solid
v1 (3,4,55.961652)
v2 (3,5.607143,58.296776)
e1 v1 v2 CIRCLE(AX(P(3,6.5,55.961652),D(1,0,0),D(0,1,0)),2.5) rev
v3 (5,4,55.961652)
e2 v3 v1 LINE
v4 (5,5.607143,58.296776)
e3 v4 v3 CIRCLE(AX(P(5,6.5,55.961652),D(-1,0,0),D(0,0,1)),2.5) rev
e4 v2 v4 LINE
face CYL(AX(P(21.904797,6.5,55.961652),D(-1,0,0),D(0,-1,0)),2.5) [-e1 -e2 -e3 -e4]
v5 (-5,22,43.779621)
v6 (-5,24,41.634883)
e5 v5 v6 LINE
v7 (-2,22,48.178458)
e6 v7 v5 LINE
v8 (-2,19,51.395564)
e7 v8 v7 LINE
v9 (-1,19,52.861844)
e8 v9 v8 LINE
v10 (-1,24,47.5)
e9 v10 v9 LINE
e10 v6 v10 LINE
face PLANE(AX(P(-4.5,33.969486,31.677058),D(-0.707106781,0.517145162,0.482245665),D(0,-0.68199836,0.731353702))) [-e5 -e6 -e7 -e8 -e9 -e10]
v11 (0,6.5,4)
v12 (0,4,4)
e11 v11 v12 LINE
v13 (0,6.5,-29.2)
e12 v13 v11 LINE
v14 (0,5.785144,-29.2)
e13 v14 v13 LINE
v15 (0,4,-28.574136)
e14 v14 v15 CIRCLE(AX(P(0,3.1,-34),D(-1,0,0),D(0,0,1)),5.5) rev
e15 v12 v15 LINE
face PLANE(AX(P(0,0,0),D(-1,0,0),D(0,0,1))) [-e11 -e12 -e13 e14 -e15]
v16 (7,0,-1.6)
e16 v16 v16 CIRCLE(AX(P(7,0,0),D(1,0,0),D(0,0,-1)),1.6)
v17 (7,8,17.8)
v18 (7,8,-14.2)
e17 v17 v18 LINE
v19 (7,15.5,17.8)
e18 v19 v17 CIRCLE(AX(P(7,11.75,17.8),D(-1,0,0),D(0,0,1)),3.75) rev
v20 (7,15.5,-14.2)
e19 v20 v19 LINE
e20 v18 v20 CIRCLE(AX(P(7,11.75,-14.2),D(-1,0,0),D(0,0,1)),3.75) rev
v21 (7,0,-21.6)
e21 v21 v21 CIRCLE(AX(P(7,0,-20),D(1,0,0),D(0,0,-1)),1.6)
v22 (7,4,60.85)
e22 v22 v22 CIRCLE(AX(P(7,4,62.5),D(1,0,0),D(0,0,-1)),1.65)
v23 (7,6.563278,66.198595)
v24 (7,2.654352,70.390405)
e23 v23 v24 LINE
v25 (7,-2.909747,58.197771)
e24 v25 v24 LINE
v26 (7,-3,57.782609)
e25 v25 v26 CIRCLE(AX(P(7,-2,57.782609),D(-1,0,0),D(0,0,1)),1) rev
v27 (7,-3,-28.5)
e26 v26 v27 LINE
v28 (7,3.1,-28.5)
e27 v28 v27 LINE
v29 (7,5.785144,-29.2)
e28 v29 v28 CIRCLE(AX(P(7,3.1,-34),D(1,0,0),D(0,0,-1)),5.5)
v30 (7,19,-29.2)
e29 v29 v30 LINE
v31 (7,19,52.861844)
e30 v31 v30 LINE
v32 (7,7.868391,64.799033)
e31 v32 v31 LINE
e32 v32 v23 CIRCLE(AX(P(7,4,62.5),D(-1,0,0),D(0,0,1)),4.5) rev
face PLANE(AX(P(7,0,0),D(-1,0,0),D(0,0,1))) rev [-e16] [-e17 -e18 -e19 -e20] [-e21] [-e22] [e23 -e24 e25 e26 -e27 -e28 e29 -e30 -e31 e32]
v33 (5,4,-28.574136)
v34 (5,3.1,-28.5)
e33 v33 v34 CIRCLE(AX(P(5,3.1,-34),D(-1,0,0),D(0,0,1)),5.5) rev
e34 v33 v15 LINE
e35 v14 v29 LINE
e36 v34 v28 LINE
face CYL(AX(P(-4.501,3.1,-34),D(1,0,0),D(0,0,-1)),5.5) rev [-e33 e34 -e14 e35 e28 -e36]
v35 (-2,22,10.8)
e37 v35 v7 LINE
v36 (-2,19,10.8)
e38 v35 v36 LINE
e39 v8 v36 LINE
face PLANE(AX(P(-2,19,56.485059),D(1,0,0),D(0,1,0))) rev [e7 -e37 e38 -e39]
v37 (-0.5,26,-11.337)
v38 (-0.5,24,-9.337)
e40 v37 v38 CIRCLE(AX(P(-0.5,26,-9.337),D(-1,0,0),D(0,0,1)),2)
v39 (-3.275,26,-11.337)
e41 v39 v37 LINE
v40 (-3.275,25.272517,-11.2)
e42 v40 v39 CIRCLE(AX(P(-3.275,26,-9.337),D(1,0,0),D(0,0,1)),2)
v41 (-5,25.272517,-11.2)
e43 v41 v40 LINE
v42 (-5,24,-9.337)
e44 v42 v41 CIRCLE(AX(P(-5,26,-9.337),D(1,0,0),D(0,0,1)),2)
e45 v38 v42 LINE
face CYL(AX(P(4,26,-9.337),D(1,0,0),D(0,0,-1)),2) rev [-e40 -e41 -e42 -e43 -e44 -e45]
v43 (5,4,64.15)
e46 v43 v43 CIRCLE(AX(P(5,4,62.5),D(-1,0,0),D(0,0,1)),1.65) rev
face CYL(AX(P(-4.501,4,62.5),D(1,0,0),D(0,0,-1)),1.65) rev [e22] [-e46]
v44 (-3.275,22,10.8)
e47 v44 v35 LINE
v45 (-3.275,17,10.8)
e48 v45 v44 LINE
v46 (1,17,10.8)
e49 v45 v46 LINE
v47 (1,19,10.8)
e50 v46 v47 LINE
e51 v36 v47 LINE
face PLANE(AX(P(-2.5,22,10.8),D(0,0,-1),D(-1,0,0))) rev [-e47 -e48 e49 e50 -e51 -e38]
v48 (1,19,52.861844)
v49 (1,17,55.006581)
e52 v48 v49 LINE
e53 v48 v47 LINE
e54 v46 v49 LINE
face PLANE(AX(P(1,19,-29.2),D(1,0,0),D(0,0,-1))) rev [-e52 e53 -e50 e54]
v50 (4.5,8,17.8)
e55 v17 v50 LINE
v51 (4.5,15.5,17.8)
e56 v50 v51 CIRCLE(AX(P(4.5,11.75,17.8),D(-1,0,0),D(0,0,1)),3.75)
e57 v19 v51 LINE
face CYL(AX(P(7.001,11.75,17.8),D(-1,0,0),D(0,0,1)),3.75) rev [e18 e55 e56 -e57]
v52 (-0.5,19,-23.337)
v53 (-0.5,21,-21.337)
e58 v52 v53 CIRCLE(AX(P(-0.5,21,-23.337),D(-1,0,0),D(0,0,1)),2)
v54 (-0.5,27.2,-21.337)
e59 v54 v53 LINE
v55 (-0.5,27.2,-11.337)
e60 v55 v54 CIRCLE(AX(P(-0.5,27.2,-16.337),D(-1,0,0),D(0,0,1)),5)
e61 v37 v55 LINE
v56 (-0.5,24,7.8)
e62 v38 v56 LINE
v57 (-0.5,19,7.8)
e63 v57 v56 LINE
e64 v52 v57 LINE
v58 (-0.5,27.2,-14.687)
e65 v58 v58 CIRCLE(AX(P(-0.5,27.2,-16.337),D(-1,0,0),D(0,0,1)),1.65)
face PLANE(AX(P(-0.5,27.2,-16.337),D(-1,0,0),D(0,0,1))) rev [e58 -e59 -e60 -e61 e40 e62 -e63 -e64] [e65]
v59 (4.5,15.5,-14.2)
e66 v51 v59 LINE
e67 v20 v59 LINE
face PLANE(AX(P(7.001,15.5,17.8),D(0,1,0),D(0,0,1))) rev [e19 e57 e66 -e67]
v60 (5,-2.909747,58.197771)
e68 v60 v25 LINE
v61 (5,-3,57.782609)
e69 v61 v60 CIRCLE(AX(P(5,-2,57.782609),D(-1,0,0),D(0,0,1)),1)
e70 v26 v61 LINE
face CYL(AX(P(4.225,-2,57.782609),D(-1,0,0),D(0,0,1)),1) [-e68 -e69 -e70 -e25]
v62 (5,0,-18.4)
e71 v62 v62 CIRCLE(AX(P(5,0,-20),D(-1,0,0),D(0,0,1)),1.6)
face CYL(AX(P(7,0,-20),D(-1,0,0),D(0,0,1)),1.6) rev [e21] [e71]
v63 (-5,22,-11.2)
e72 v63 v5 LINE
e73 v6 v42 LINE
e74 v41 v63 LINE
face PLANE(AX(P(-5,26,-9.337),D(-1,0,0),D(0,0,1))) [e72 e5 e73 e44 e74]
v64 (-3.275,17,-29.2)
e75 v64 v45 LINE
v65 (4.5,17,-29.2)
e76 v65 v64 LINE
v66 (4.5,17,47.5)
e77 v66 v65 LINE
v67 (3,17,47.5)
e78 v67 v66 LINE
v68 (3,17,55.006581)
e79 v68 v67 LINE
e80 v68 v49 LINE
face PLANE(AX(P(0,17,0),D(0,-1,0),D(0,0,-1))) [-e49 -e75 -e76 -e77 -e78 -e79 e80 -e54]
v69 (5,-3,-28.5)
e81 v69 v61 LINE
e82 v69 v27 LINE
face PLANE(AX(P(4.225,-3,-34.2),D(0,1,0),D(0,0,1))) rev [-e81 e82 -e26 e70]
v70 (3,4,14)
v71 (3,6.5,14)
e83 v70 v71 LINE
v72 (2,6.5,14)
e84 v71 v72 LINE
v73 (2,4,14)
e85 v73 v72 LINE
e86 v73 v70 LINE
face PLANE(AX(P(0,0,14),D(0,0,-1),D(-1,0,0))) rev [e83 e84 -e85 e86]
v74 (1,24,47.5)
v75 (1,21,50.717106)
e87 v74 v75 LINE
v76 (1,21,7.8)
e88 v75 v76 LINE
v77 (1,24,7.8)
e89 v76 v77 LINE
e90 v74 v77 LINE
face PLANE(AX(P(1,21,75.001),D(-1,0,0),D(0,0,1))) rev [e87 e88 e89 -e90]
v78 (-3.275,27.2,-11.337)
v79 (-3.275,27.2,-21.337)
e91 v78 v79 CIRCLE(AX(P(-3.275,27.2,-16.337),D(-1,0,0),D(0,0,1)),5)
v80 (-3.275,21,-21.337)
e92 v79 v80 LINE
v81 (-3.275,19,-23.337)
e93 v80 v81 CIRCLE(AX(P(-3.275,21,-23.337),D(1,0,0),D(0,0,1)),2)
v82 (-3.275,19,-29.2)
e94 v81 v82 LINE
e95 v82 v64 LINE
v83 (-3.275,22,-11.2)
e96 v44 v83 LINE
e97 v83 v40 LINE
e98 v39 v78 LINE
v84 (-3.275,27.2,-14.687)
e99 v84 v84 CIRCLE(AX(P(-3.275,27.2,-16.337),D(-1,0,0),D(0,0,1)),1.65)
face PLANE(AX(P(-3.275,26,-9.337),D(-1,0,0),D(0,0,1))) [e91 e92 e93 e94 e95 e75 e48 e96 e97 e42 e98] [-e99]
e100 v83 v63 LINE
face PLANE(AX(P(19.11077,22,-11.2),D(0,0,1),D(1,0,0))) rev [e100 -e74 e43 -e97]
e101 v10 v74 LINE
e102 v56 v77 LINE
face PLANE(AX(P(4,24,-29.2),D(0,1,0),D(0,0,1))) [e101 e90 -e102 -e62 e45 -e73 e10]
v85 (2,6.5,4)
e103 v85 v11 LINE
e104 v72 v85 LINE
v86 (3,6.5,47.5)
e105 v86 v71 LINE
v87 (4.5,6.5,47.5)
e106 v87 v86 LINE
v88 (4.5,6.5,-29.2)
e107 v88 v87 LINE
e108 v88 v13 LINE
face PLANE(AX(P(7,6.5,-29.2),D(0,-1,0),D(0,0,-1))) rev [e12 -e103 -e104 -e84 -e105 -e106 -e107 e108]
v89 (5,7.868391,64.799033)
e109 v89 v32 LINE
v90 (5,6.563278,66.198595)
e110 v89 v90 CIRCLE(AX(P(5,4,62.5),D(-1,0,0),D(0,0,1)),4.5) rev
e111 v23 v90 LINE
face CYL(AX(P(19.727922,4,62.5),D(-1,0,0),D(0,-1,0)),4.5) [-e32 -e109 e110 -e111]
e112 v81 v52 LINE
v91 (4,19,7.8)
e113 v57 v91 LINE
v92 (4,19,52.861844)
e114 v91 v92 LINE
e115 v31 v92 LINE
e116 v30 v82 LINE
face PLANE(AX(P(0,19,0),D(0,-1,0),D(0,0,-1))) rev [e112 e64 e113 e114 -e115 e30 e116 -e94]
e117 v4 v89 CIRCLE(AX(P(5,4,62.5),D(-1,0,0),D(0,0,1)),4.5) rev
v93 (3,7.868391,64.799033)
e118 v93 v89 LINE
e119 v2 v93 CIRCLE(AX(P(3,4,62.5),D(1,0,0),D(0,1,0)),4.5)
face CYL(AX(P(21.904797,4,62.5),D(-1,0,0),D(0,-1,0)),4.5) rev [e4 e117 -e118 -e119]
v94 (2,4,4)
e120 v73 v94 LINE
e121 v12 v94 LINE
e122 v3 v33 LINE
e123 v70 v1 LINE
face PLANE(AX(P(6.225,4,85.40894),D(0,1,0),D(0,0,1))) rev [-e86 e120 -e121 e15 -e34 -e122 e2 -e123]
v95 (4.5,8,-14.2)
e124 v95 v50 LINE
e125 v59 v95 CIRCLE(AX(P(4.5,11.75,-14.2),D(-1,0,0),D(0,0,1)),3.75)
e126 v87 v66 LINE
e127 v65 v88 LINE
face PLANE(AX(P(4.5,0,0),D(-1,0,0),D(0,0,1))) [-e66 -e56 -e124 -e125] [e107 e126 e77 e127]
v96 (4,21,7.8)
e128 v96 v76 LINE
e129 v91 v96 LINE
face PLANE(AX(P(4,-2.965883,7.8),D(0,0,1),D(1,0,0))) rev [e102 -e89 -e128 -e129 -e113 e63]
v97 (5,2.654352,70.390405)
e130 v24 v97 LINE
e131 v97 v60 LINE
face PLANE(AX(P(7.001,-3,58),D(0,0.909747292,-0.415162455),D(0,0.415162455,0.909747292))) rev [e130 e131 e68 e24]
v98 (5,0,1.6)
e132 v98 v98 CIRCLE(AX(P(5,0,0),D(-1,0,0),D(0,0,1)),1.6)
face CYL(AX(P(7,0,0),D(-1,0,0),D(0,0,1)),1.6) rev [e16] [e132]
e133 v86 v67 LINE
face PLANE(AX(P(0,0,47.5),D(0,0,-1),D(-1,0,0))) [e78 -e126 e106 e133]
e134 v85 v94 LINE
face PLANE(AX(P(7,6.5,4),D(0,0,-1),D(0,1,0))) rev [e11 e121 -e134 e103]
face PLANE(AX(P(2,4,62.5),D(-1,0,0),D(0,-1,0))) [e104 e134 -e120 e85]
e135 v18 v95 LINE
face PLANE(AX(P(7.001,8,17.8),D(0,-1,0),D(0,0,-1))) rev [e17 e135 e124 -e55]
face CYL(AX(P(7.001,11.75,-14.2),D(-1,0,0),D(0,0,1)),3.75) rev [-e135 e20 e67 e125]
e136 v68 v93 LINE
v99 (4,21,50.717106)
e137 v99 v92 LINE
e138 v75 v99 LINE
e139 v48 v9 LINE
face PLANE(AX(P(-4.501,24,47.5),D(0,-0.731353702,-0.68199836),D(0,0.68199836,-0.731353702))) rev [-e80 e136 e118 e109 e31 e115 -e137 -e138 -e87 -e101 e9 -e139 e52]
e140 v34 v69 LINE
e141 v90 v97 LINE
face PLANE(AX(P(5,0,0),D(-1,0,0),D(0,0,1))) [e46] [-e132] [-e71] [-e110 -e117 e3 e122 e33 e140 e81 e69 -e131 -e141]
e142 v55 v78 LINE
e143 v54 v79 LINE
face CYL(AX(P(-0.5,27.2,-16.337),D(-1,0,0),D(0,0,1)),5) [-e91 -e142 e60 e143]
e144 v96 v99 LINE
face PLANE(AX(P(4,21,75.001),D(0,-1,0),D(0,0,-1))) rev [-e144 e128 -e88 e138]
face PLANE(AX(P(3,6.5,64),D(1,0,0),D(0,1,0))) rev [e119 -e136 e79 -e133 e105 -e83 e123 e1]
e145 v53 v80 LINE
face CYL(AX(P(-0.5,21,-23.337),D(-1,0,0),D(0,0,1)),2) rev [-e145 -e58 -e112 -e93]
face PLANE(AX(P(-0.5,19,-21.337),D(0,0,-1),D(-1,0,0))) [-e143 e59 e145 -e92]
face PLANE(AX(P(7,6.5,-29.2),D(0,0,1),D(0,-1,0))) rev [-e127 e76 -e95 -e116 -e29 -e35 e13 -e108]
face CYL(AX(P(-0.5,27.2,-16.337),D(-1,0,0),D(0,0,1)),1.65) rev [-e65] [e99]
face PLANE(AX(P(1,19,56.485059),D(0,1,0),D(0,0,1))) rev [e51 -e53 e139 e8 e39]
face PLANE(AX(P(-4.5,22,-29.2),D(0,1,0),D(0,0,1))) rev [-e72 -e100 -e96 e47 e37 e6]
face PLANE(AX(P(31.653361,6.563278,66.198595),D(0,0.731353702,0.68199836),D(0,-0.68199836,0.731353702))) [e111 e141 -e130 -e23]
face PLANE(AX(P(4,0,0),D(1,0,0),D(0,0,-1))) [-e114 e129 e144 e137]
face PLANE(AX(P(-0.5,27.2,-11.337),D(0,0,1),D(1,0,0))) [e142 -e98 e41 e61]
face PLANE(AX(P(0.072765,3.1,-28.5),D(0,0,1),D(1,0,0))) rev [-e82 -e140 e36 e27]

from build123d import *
from build123d.topology import SkipClean

# Parameters (mm, degrees)
SKETCH_1_W                       = 33.2
SKETCH_1_H                       = 22
SKETCH_1_R                       = 1.6
EXTRUDE_1_DEPTH                  = 7
SKETCH_2_W                       = 33.2
SKETCH_2_H                       = 10.5
EXTRUDE_2_DEPTH                  = 2
EXTRUDE_3_DEPTH                  = 60
SKETCH_4_W                       = 2
SKETCH_4_H                       = 10.5
EXTRUDE_4_DEPTH                  = 38.5
SKETCH_5_W                       = 4
SKETCH_5_H                       = 10.5
EXTRUDE_5_DEPTH                  = 2
SKETCH_6_W                       = 4
SKETCH_6_H                       = 10.5
EXTRUDE_6_DEPTH                  = 19.5
SKETCH_7_W                       = 6
SKETCH_7_H                       = 93.2
EXTRUDE_7_DEPTH                  = 2
SKETCH_8_W                       = 93.2
SKETCH_8_H                       = 5
EXTRUDE_8_DEPTH                  = 3
SKETCH_10_W                      = 93.2
SKETCH_10_H                      = 2
EXTRUDE_9_DEPTH                  = 5.5
SKETCH_12_W                      = 18
SKETCH_12_H                      = 2
CUT_EXTRUDE_1_DEPTH              = 5.5
SKETCH_13_W                      = 40
SKETCH_13_H                      = 5
EXTRUDE_10_DEPTH                 = 3.5
CUT_EXTRUDE_2_REACH              = 70.879
SKETCH_15_W                      = 15.5
SKETCH_15_H                      = 5
SKETCH_16_W                      = 3.5
SKETCH_16_H                      = 2.5
EXTRUDE_12_DEPTH                 = 2
CUT_EXTRUDE_3_REACH              = 71.313
CHAMFER_1_SIZE                   = 3.5
SKETCH_18_R                      = 1.65
EXTRUDE_13_DEPTH                 = 2
FILLET_1_R                       = 2
SKETCH_19_W                      = 4.5
SKETCH_19_H                      = 21.5
CUT_EXTRUDE_4_DEPTH              = 5
CHAMFER_2_SIZE                   = 3
CUT_EXTRUDE_5_REACH              = 74.561
SKETCH_20_R                      = 1.65
EXTRUDE_14_REACH                 = 73.895
SKETCH_21_R                      = 4.5
SKETCH_21_R_2                    = 1.65
EXTRUDE_15_DEPTH                 = 6
EXTRUDE_16_DEPTH                 = 4
CUT_EXTRUDE_6_REACH              = 83.84
SKETCH_24_R                      = 1.65
CUT_EXTRUDE_7_REACH              = 84.171
SKETCH_26_W                      = 2
SKETCH_26_H                      = 10.5
CUT_EXTRUDE_8_DEPTH              = 5
SKETCH_27_W                      = 2
SKETCH_27_H                      = 2
EXTRUDE_17_DEPTH                 = 10
CUT_EXTRUDE_9_DEPTH              = 2
CUT_EXTRUDE_10_REACH             = 84.426
SKETCH_29_R                      = 5.5
SKETCH_30_W                      = 63
SKETCH_30_H                      = 2
EXTRUDE_18_DEPTH                 = 1
SKETCH_32_R                      = 1.65
EXTRUDE_19_DEPTH                 = 0.775
EXTRUDE_20_DEPTH                 = 5.5
SKETCH_35_W                      = 5
SKETCH_35_H                      = 10
CUT_EXTRUDE_12_DEPTH             = 1.225
SKETCH_36_W                      = 4
SKETCH_36_H                      = 10
EXTRUDE_21_DEPTH                 = 5
CUT_EXTRUDE_13_REACH             = 84.197
SKETCH_37_W                      = 4.75
SKETCH_37_H                      = 3
CUT_EXTRUDE_13_DIRECTION_2_REACH = 84.197
CUT_EXTRUDE_14_REACH             = 84.197
SKETCH_38_W                      = 14.6
SKETCH_38_H                      = 11
CUT_EXTRUDE_14_DIRECTION_2_DEPTH = 1
SKETCH_39_W                      = 1.5
SKETCH_39_H                      = 20
EXTRUDE_22_DEPTH                 = 5.8
EXTRUDE_22_DIRECTION_2_REACH     = 116.063
SKETCH_40_W                      = 1.5
SKETCH_40_H                      = 10
EXTRUDE_23_DEPTH                 = 5
CUT_EXTRUDE_15_REACH             = 84.085
SKETCH_41_W                      = 1
SKETCH_41_H                      = 7
CHAMFER_3_SIZE                   = 1
SKETCH_42_W                      = 2.775
SKETCH_42_H                      = 5
EXTRUDE_24_DEPTH                 = 10.8
CUT_EXTRUDE_16_REACH             = 84.085
SKETCH_43_W                      = 0.6
SKETCH_43_H                      = 2
SKETCH_44_W                      = 9.8
SKETCH_44_H                      = 2
EXTRUDE_25_DEPTH                 = 2
SKETCH_45_W                      = 0.8
SKETCH_45_H                      = 6.1
CUT_EXTRUDE_17_DEPTH             = 0.775
CUT_EXTRUDE_18_REACH             = 84.426
SKETCH_46_R                      = 2.05
CUT_EXTRUDE_19_DEPTH             = 1
SKETCH_48_R                      = 2.05
CUT_EXTRUDE_20_DEPTH             = 5
CUT_EXTRUDE_21_REACH             = 113.959
SKETCH_50_W                      = 0.5
SKETCH_50_H                      = 17.5
CUT_EXTRUDE_22_DEPTH             = 3
EXTRUDE_26_DEPTH                 = 14.5
EXTRUDE_27_DEPTH                 = 0.5
SKETCH_54_W                      = 28.68337521
SKETCH_54_H                      = 12.5
SKETCH_54_W_2                    = 11.341687605
CUT_EXTRUDE_23_DEPTH             = 3
EXTRUDE_28_REACH                 = 83.879
FILLET_2_R                       = 0.8
EXTRUDE_START                    = -3.5
SKETCH_56_R                      = 4
SKETCH_56_R_2                    = 2.05
EXTRUDE_29_DEPTH                 = 3.5
FILLET_3_R                       = 0.8
CUT_EXTRUDE_24_REACH             = 83.879
SKETCH_57_R                      = 2.05
SKETCH_58_W                      = 15.2
SKETCH_58_H                      = 8.5
CUT_EXTRUDE_25_DEPTH             = 3.5
FILLET_4_R                       = 0.8
EXTRUDE_START_2                  = 0.5
SKETCH_31_W                      = 76.7
SKETCH_31_H                      = 10.5
EXTRUDE_30_DEPTH                 = 0.5
CUT_EXTRUDE_26_REACH             = 83.939
SKETCH_59_W                      = 2.6
SKETCH_59_H                      = 10
CUT_EXTRUDE_27_REACH             = 83.939
EXTRUDE_31_DEPTH                 = 1.5
SKETCH_62_W                      = 2.775
SKETCH_62_H                      = 2
EXTRUDE_32_DEPTH                 = 1.5
EXTRUDE_33_DEPTH                 = 1.5
SKETCH_64_W                      = 4.275
SKETCH_64_H                      = 5
EXTRUDE_34_DEPTH                 = 5
CHAMFER_4_SIZE                   = 2
EXTRUDE_START_3                  = 1.5
SKETCH_65_R                      = 2.05
EXTRUDE_35_DEPTH                 = 1.5
CUT_EXTRUDE_28_DEPTH             = 1
SKETCH_67_W                      = 1.5
SKETCH_67_H                      = 1.5
EXTRUDE_36_DEPTH                 = 1.5
CUT_EXTRUDE_29_REACH             = 76.844
EXTRUDE_37_REACH                 = 74.163
CUT_EXTRUDE_30_DEPTH             = 10
EXTRUDE_38_DEPTH                 = 0.5
CUT_EXTRUDE_START                = -36.378813151
CUT_EXTRUDE_31_OUTLINE_W         = 3
CUT_EXTRUDE_31_OUTLINE_H         = 6
CUT_EXTRUDE_31_DEPTH             = 0.35355339
FILLET_5_R                       = 1
CUT_EXTRUDE_32_DEPTH             = 101
CUT_EXTRUDE_34_REACH             = 83.84
CUT_EXTRUDE_34_DIRECTION_2_REACH = 83.84
EXTRUDE_START_4                  = 1.225
SKETCH_76_R                      = 1.6
EXTRUDE_40_DEPTH                 = 1.225
CUT_EXTRUDE_35_DEPTH             = 4
CUT_EXTRUDE_36_REACH             = 79.818
FILLET_7_R                       = 1
FILLET_8_R                       = 2.5


# Read off the part's stored shape, not the designer's step: 切除-拉伸31
# Some blends are built 0.0001 mm under size
with BuildPart() as part:
    # 草图1 → 凸台-拉伸1 (new body)
    with BuildSketch(Plane(origin=(0, 0, 0), x_dir=(0, 0, -1), z_dir=(1, 0, 0))):
        with Locations((12.6, -4.5)):
            Rectangle(SKETCH_1_W, SKETCH_1_H)
        Circle(SKETCH_1_R, mode=Mode.SUBTRACT)
        with Locations((20, 0)):
            Circle(SKETCH_1_R, mode=Mode.SUBTRACT)
    extrude(amount=EXTRUDE_1_DEPTH)

    # 草图2 → 凸台-拉伸2 (add)
    with BuildSketch(Plane(origin=(7, 0, 0), x_dir=(0, 0, -1), z_dir=(1, 0, 0))):
        with Locations((12.6, 11.75)):
            Rectangle(SKETCH_2_W, SKETCH_2_H)
    extrude(amount=-EXTRUDE_2_DEPTH)

    # 草图3 → 凸台-拉伸3 (add)
    with BuildSketch(Plane.XY.offset(4)):
        Polygon((7, -15.5), (1, -15.5), (1, 4.5), (3, 4.5), (3, 6.5), (7, 6.5), align=None)
    extrude(amount=EXTRUDE_3_DEPTH)

    # 草图4 → 凸台-拉伸4 (add)
    with BuildSketch(Plane.XY.offset(4)):
        with Locations((6, 11.75)):
            Rectangle(SKETCH_4_W, SKETCH_4_H)
    extrude(amount=EXTRUDE_4_DEPTH)

    # 草图5 → 凸台-拉伸5 (add)
    with BuildSketch(Plane.XY.offset(42.5)):
        with Locations((5, 11.75)):
            Rectangle(SKETCH_5_W, SKETCH_5_H)
    extrude(amount=EXTRUDE_5_DEPTH)

    # 草图6 → 凸台-拉伸6 (add)
    with BuildSketch(Plane.XY.offset(44.5)):
        with Locations((5, 11.75)):
            Rectangle(SKETCH_6_W, SKETCH_6_H)
    extrude(amount=EXTRUDE_6_DEPTH)

    # 草图7 → 凸台-拉伸7 (add)
    with BuildSketch(Plane(origin=(0, 17, 0), x_dir=(1, 0, 0), z_dir=(0, 1, 0))):
        with Locations((4, -17.4)):
            Rectangle(SKETCH_7_W, SKETCH_7_H)
    extrude(amount=EXTRUDE_7_DEPTH)

    # 草图8 → 凸台-拉伸8 (add)
    with BuildSketch(Plane.ZY.offset(-1)):
        with Locations((17.4, 21.5)):
            Rectangle(SKETCH_8_W, SKETCH_8_H)
    extrude(amount=-EXTRUDE_8_DEPTH)

    # 草图10 → 凸台-拉伸9 (add)
    with BuildSketch(Plane.ZY.offset(-1)):
        with Locations((17.4, 23)):
            Rectangle(SKETCH_10_W, SKETCH_10_H)
    extrude(amount=EXTRUDE_9_DEPTH)

    # 草图12 → 切除-拉伸1 (cut)
    with BuildSketch(Plane.ZY.offset(4.5)):
        with Locations((-20.2, 23)):
            Rectangle(SKETCH_12_W, SKETCH_12_H)
    extrude(amount=-CUT_EXTRUDE_1_DEPTH, mode=Mode.SUBTRACT)

    # 草图13 → 凸台-拉伸10 (add)
    with BuildSketch(Plane.ZY.offset(-1)):
        with Locations((-9.2, 19.5)):
            Rectangle(SKETCH_13_W, SKETCH_13_H)
    extrude(amount=EXTRUDE_10_DEPTH)

    # 草图15 → 切除-拉伸2 (cut, up to next)
    with BuildSketch(Plane(origin=(4, 0, 0), x_dir=(0, 0, -1), z_dir=(1, 0, 0)), mode=Mode.PRIVATE) as cut_extrude_2_sk1:
        with Locations((21.45, 21.5)):
            Rectangle(SKETCH_15_W, SKETCH_15_H)
    cut_extrude_2_tool1 = extrude(cut_extrude_2_sk1.sketch, amount=-CUT_EXTRUDE_2_REACH, mode=Mode.PRIVATE) & part.part
    add(cut_extrude_2_tool1.solids().sort_by_distance((4, 21.5, -21.45))[0], mode=Mode.SUBTRACT)

    # 草图16 → 凸台-拉伸12 (add)
    with BuildSketch(Plane(origin=(0, 22, 0), x_dir=(1, 0, 0), z_dir=(0, 1, 0))):
        with Locations((-0.75, 12.45)):
            Rectangle(SKETCH_16_W, SKETCH_16_H)
    extrude(amount=EXTRUDE_12_DEPTH)

    # 草图17 → 切除-拉伸3 (cut, up to next)
    with BuildSketch(Plane(origin=(7, 0, 0), x_dir=(0, 0, -1), z_dir=(1, 0, 0)), mode=Mode.PRIVATE) as cut_extrude_3_sk1:
        Polygon((-47.5, 24), (-64, 8.613501079), (-64, 24), align=None)
    cut_extrude_3_tool1 = extrude(cut_extrude_3_sk1.sketch, amount=-CUT_EXTRUDE_3_REACH, mode=Mode.PRIVATE) & part.part
    add(cut_extrude_3_tool1.solids().sort_by_distance((7, 18.871167, 58.5))[0], mode=Mode.SUBTRACT)

    # 倒角1
    # the kernel refuses this chamfer: 3.5 mm, written as the material it takes off along each edge
    with BuildSketch(Plane(origin=(-4.5, 15.861407469, 56.227571974), x_dir=(0.9996219169112969, 0.020109211138415985, 0.018752142756900524), z_dir=(0, 0.6819983600625026, -0.7313537016191667))) as chamfer_1_piece_1:
        Polygon((CHAMFER_1_SIZE * 0.999621916911, CHAMFER_1_SIZE * 0.0274958766106), (-CHAMFER_1_SIZE * 0.0274958766106, CHAMFER_1_SIZE * 0.999621916911), (0, 0), align=None)
    extrude(amount=20.934339287, mode=Mode.SUBTRACT)

    # 草图18 → 凸台-拉伸13 (add)
    with BuildSketch(Plane.ZY.offset(2.5)):
        with BuildLine():
            Line((-11.337, 27.2), (-11.337, 24))
            Line((-11.337, 24), (-13.7, 24))
            Line((-13.7, 24), (-13.7, 19))
            Line((-13.7, 19), (-21.337, 19))
            Line((-21.337, 19), (-21.337, 27.2))
            ThreePointArc((-21.337, 27.2), (-16.337, 32.2), (-11.337, 27.2))
        make_face()
        with Locations((-16.337, 27.2)):
            Circle(SKETCH_18_R, mode=Mode.SUBTRACT)
    extrude(amount=-EXTRUDE_13_DEPTH)

    # 圆角1
    fillet_1_edges = [part.edges().sort_by_distance(p)[0] for p in [
        (-1.5, 24, -11.337),
        (-1.5, 19, -21.337),
    ]]
    fillet(fillet_1_edges, radius=FILLET_1_R)

    # 草图19 → 切除-拉伸4 (cut)
    with BuildSketch(Plane(origin=(0, 24, 0), x_dir=(1, 0, 0), z_dir=(0, 1, 0))):
        with Locations((1.75, 2.95)):
            Rectangle(SKETCH_19_W, SKETCH_19_H)
    extrude(amount=-CUT_EXTRUDE_4_DEPTH, mode=Mode.SUBTRACT)

    # 倒角2
    chamfer_2_edges = [part.edges().sort_by_distance(p)[0] for p in [
        (4, 24, 27.65),
        (1, 22, 30.22236871),
    ]]
    chamfer(chamfer_2_edges, length=CHAMFER_2_SIZE)

    # 草图20 → 切除-拉伸5 (cut, up to next)
    with BuildSketch(Plane(origin=(7, 0, 0), x_dir=(0, 0, -1), z_dir=(1, 0, 0)), mode=Mode.PRIVATE) as cut_extrude_5_sk1:
        with Locations((-62.5, 4)):
            Circle(SKETCH_20_R)
    cut_extrude_5_tool1 = extrude(cut_extrude_5_sk1.sketch, amount=-CUT_EXTRUDE_5_REACH, mode=Mode.PRIVATE) & part.part
    add(cut_extrude_5_tool1.solids().sort_by_distance((7, 4, 62.5))[0], mode=Mode.SUBTRACT)

    # 凸台-拉伸14: up to this face of the body (flat: up to its plane)
    extrude_14_end = Plane(part.part.faces().sort_by_distance((7, 1.498387626, 16.627822956))[0])
    # 草图21 → 凸台-拉伸14 (add, up to the picked face)
    with BuildSketch(Plane.ZY.offset(-1), mode=Mode.PRIVATE) as extrude_14_sk1:
        with Locations((62.5, 4)):
            Circle(SKETCH_21_R)
        with Locations(Location((62.5, 4, 0), (0, 0, 180))):
            Circle(SKETCH_21_R_2, mode=Mode.SUBTRACT)
    extrude_14_tool1 = split(extrude(extrude_14_sk1.sketch, amount=-EXTRUDE_14_REACH, mode=Mode.PRIVATE), bisect_by=extrude_14_end, keep=Keep.BOTH, mode=Mode.PRIVATE)
    add(extrude_14_tool1.solids().sort_by(Axis((1, 4, 58.127279), (1, 0, 0)))[0])

    # 草图22 → 凸台-拉伸15 (add)
    with BuildSketch(Plane.ZY.offset(-1)):
        with BuildLine():
            Line((66.198595209, 6.563277878), (75, -1.644164869))
            Line((75, -1.644164869), (75, -15.5))
            Line((75, -15.5), (64, -15.5))
            Line((64, -15.5), (64, -0.242640687))
            ThreePointArc((64, -0.242640687), (66.782111619, 2.616699568), (66.198595209, 6.563277878))
        make_face()
    extrude(amount=-EXTRUDE_15_DEPTH)

    # 草图23 → 凸台-拉伸16 (add)
    with BuildSketch(Plane(origin=(7, 0, 0), x_dir=(0, 0, -1), z_dir=(1, 0, 0))):
        Polygon((-64, 8.613501079), (-64.799032902, 7.868390843), (-64, 8.242640687), align=None)
    extrude(amount=-EXTRUDE_16_DEPTH)

    # 草图24 → 切除-拉伸6 (cut, up to next)
    with BuildSketch(Plane.ZY.offset(-1), mode=Mode.PRIVATE) as cut_extrude_6_sk1:
        with Locations(Location((71, -10.5, 0), (0, 0, 270))):
            Circle(SKETCH_24_R)
    cut_extrude_6_tool1 = extrude(cut_extrude_6_sk1.sketch, amount=-CUT_EXTRUDE_6_REACH, mode=Mode.PRIVATE) & part.part
    add(cut_extrude_6_tool1.solids().sort_by_distance((1, -10.5, 71))[0], mode=Mode.SUBTRACT)

    # 草图25 → 切除-拉伸7 (cut, up to next)
    with BuildSketch(Plane.ZY.offset(-5), mode=Mode.PRIVATE) as cut_extrude_7_sk1:
        with BuildLine():
            Line((17.8, 8), (-14.2, 8))
            ThreePointArc((-14.2, 8), (-17.95, 11.75), (-14.2, 15.5))
            Line((-14.2, 15.5), (17.8, 15.5))
            ThreePointArc((17.8, 15.5), (21.55, 11.75), (17.8, 8))
        make_face()
    cut_extrude_7_tool1 = extrude(cut_extrude_7_sk1.sketch, amount=-CUT_EXTRUDE_7_REACH, mode=Mode.PRIVATE) & part.part
    add(cut_extrude_7_tool1.solids().sort_by_distance((5, 11.75, 1.8))[0], mode=Mode.SUBTRACT)

    # 草图26 → 切除-拉伸8 (cut)
    with BuildSketch(Plane(origin=(0, 0, 42.5), x_dir=(-1, 0, 0), z_dir=(0, 0, -1))):
        with Locations((-4, 11.75)):
            Rectangle(SKETCH_26_W, SKETCH_26_H)
    extrude(amount=-CUT_EXTRUDE_8_DEPTH, mode=Mode.SUBTRACT)

    # 草图27 → 凸台-拉伸17 (add)
    with BuildSketch(Plane.XY.offset(4)):
        with Locations((2, 5.5)):
            Rectangle(SKETCH_27_W, SKETCH_27_H)
    extrude(amount=EXTRUDE_17_DEPTH)

    # 草图28 → 切除-拉伸9 (cut)
    with BuildSketch(Plane.ZY.offset(-1)):
        Polygon((67, 1.494263267), (67, -15.5), (75, -15.5), (75, -1.644164869), (69.155582564, 3.80584256), align=None)
    extrude(amount=-CUT_EXTRUDE_9_DEPTH, mode=Mode.SUBTRACT)

    # 草图29 → 切除-拉伸10 (cut, up to next)
    with BuildSketch(Plane(origin=(7, 0, 0), x_dir=(0, 0, -1), z_dir=(1, 0, 0)), mode=Mode.PRIVATE) as cut_extrude_10_sk1:
        with Locations((34, 3.1)):
            Circle(SKETCH_29_R)
    cut_extrude_10_tool1 = extrude(cut_extrude_10_sk1.sketch, amount=-CUT_EXTRUDE_10_REACH, mode=Mode.PRIVATE) & part.part
    add(cut_extrude_10_tool1.solids().sort_by_distance((7, 3.1, -34))[0], mode=Mode.SUBTRACT)

    # 草图30 → 凸台-拉伸18 (add)
    with BuildSketch(Plane.ZY.offset(-1)):
        with Locations((35.5, -5.5)):
            Rectangle(SKETCH_30_W, SKETCH_30_H)
    extrude(amount=EXTRUDE_18_DEPTH)

    # 草图32 → 凸台-拉伸19 (add)
    with BuildSketch(Plane.ZY.offset(2.5)):
        with BuildLine():
            Line((-11.2, 22), (-11.2, 25.272517354))
            ThreePointArc((-11.2, 25.272517354), (-11.302451602, 25.62986489), (-11.337, 26))
            Line((-11.337, 26), (-11.337, 27.2))
            ThreePointArc((-11.337, 27.2), (-16.337, 32.2), (-21.337, 27.2))
            Line((-21.337, 27.2), (-21.337, 21))
            ThreePointArc((-21.337, 21), (-21.922786438, 19.585786438), (-23.337, 19))
            Line((-23.337, 19), (-29.2, 19))
            Line((-29.2, 19), (-29.2, 17))
            Line((-29.2, 17), (10.8, 17))
            Line((10.8, 17), (10.8, 22))
            Line((10.8, 22), (-11.2, 22))
        make_face()
        with Locations((-16.337, 27.2)):
            Circle(SKETCH_32_R, mode=Mode.SUBTRACT)
    extrude(amount=EXTRUDE_19_DEPTH)

    # 草图34 → 凸台-拉伸20 (add)
    with BuildSketch(Plane.XZ.offset(15.5)):
        Polygon((3, 75), (3, 67), (1, 67), (1, 4), (0, 4), (0, -29.2), (7, -29.2), (7, 75), align=None)
    extrude(amount=EXTRUDE_20_DEPTH)

    # 草图35 → 切除-拉伸12 (cut)
    with BuildSketch(Plane.ZY):
        with Locations((-26.7, -16)):
            Rectangle(SKETCH_35_W, SKETCH_35_H)
    extrude(amount=-CUT_EXTRUDE_12_DEPTH, mode=Mode.SUBTRACT)

    # 草图36 → 凸台-拉伸21 (add)
    with BuildSketch(Plane(origin=(0, 0, -29.2), x_dir=(-1, 0, 0), z_dir=(0, 0, -1))):
        with Locations((-3.225, -16)):
            Rectangle(SKETCH_36_W, SKETCH_36_H)
    extrude(amount=EXTRUDE_21_DEPTH)

    # 草图37 → 切除-拉伸13 (cut, up to next)
    with BuildSketch(Plane(origin=(5.225, 0, 0), x_dir=(0, 0, -1), z_dir=(1, 0, 0)), mode=Mode.PRIVATE) as cut_extrude_13_sk1:
        with Locations((31.225, -14.5)):
            Rectangle(SKETCH_37_W, SKETCH_37_H)
    cut_extrude_13_tool1 = extrude(cut_extrude_13_sk1.sketch, amount=-CUT_EXTRUDE_13_REACH, mode=Mode.PRIVATE) & part.part
    add(cut_extrude_13_tool1.solids().sort_by_distance((5.225, -14.5, -31.225))[0], mode=Mode.SUBTRACT)

    # 草图37 → 切除-拉伸13 direction 2 (cut, up to next)
    with BuildSketch(Plane(origin=(5.225, 0, 0), x_dir=(0, 0, -1), z_dir=(1, 0, 0)), mode=Mode.PRIVATE) as cut_extrude_13_direction_2_sk1:
        with Locations((31.225, -14.5)):
            Rectangle(SKETCH_37_W, SKETCH_37_H)
    cut_extrude_13_direction_2_tool1 = extrude(cut_extrude_13_direction_2_sk1.sketch, amount=CUT_EXTRUDE_13_DIRECTION_2_REACH, mode=Mode.PRIVATE) & part.part
    add(cut_extrude_13_direction_2_tool1.solids().sort_by_distance((5.225, -14.5, -31.225))[0], mode=Mode.SUBTRACT)

    # 草图38 → 切除-拉伸14 (cut, up to next)
    with BuildSketch(Plane(origin=(5.225, 0, 0), x_dir=(0, 0, -1), z_dir=(1, 0, 0)), mode=Mode.PRIVATE) as cut_extrude_14_sk1:
        with Locations((26.9, -8.5)):
            Rectangle(SKETCH_38_W, SKETCH_38_H)
    cut_extrude_14_tool1 = extrude(cut_extrude_14_sk1.sketch, amount=CUT_EXTRUDE_14_REACH, mode=Mode.PRIVATE) & part.part
    add(cut_extrude_14_tool1.solids().sort_by_distance((5.225, -8.5, -26.9))[0], mode=Mode.SUBTRACT)

    # 草图38 → 切除-拉伸14 direction 2 (cut)
    with BuildSketch(Plane(origin=(5.225, 0, 0), x_dir=(0, 0, -1), z_dir=(1, 0, 0))):
        with Locations((26.9, -8.5)):
            Rectangle(SKETCH_38_W, SKETCH_38_H)
    extrude(amount=-CUT_EXTRUDE_14_DIRECTION_2_DEPTH, mode=Mode.SUBTRACT)

    # 草图39 → 凸台-拉伸22 (add)
    with BuildSketch(Plane(origin=(0, 0, -34.2), x_dir=(-1, 0, 0), z_dir=(0, 0, -1))):
        with Locations((-3.475, -11)):
            Rectangle(SKETCH_39_W, SKETCH_39_H)
    extrude(amount=EXTRUDE_22_DEPTH)

    # 草图39 → 凸台-拉伸22 direction 2 (add, up to next)
    with BuildSketch(Plane(origin=(0, 0, -34.2), x_dir=(-1, 0, 0), z_dir=(0, 0, -1)), mode=Mode.PRIVATE) as extrude_22_direction_2_sk1:
        with Locations((-3.475, -11)):
            Rectangle(SKETCH_39_W, SKETCH_39_H)
    extrude_22_direction_2_tool1 = extrude(extrude_22_direction_2_sk1.sketch, amount=-EXTRUDE_22_DIRECTION_2_REACH, mode=Mode.PRIVATE) - part.part
    add(extrude_22_direction_2_tool1.solids().sort_by_distance((3.475, -11, -34.2))[0])

    # 草图40 → 凸台-拉伸23 (add)
    with BuildSketch(Plane(origin=(0, 0, -29.2), x_dir=(-1, 0, 0), z_dir=(0, 0, -1))):
        with Locations((-1.975, -6)):
            Rectangle(SKETCH_40_W, SKETCH_40_H)
    extrude(amount=EXTRUDE_23_DEPTH)

    # 草图41 → 切除-拉伸15 (cut, up to next)
    with BuildSketch(Plane(origin=(4.225, 0, 0), x_dir=(0, 0, -1), z_dir=(1, 0, 0)), mode=Mode.PRIVATE) as cut_extrude_15_sk1:
        with Locations((39.5, -4.5)):
            Rectangle(SKETCH_41_W, SKETCH_41_H)
    cut_extrude_15_tool1 = extrude(cut_extrude_15_sk1.sketch, amount=-CUT_EXTRUDE_15_REACH, mode=Mode.PRIVATE) & part.part
    add(cut_extrude_15_tool1.solids().sort_by_distance((4.225, -4.5, -39.5))[0], mode=Mode.SUBTRACT)

    # 倒角3
    chamfer_3_edges = [part.edges().sort_by_distance(p)[0] for p in [
        (3.475, -8, -39),
    ]]
    chamfer(chamfer_3_edges, length=CHAMFER_3_SIZE - 0.0001)  # a hair under: the kernel refuses the full size

    # 草图42 → 凸台-拉伸24 (add)
    with BuildSketch(Plane(origin=(0, 0, -29.2), x_dir=(-1, 0, 0), z_dir=(0, 0, -1))):
        with Locations((-5.6125, -18.5)):
            Rectangle(SKETCH_42_W, SKETCH_42_H)
    extrude(amount=EXTRUDE_24_DEPTH)

    # 草图43 → 切除-拉伸16 (cut, up to next)
    with BuildSketch(Plane(origin=(4.225, 0, 0), x_dir=(0, 0, -1), z_dir=(1, 0, 0)), mode=Mode.PRIVATE) as cut_extrude_16_sk1:
        with Locations((33.9, -15)):
            Rectangle(SKETCH_43_W, SKETCH_43_H)
    cut_extrude_16_tool1 = extrude(cut_extrude_16_sk1.sketch, amount=CUT_EXTRUDE_16_REACH, mode=Mode.PRIVATE) & part.part
    add(cut_extrude_16_tool1.solids().sort_by_distance((4.225, -15, -33.9))[0], mode=Mode.SUBTRACT)

    # 草图44 → 凸台-拉伸25 (add)
    with BuildSketch(Plane(origin=(4.225, 0, 0), x_dir=(0, 0, -1), z_dir=(1, 0, 0))):
        with Locations((34.1, -2)):
            Rectangle(SKETCH_44_W, SKETCH_44_H)
    extrude(amount=EXTRUDE_25_DEPTH)

    # 草图45 → 切除-拉伸17 (cut)
    with BuildSketch(Plane(origin=(7, 0, 0), x_dir=(0, 0, -1), z_dir=(1, 0, 0))):
        with Locations((28.9, 0.05)):
            Rectangle(SKETCH_45_W, SKETCH_45_H)
    extrude(amount=-CUT_EXTRUDE_17_DEPTH, mode=Mode.SUBTRACT)

    # 草图46 → 切除-拉伸18 (cut, up to next)
    with BuildSketch(Plane(origin=(7, 0, 0), x_dir=(0, 0, -1), z_dir=(1, 0, 0)), mode=Mode.PRIVATE) as cut_extrude_18_sk1:
        with Locations((13.25, -17)):
            Circle(SKETCH_46_R)
    cut_extrude_18_tool1 = extrude(cut_extrude_18_sk1.sketch, amount=-CUT_EXTRUDE_18_REACH, mode=Mode.PRIVATE) & part.part
    add(cut_extrude_18_tool1.solids().sort_by_distance((7, -17, -13.25))[0], mode=Mode.SUBTRACT)

    # 草图47 → 切除-拉伸19 (cut)
    with BuildSketch(Plane.ZY.offset(-1)):
        with BuildLine():
            Line((62.5, -0.5), (67, -0.5))
            Line((67, -0.5), (67, -4.5))
            Line((67, -4.5), (4, -4.5))
            Line((4, -4.5), (4, 6.5))
            Line((4, 6.5), (14, 6.5))
            Line((14, 6.5), (14, 4.5))
            Line((14, 4.5), (58.027864045, 4.5))
            ThreePointArc((58.027864045, 4.5), (59.145898034, 1), (62.5, -0.5))
        make_face()
    extrude(amount=-CUT_EXTRUDE_19_DEPTH, mode=Mode.SUBTRACT)

    # 草图48 → 切除-拉伸20 (cut)
    with BuildSketch(Plane.XZ.offset(21)):
        with Locations(Location((3.5, 58, 0), (0, 0, 270))):
            Circle(SKETCH_48_R)
        with Locations(Location((3.5, 20, 0), (0, 0, 270))):
            Circle(SKETCH_48_R)
        with Locations(Location((3.5, -18, 0), (0, 0, 270))):
            Circle(SKETCH_48_R)
    extrude(amount=-CUT_EXTRUDE_20_DEPTH, mode=Mode.SUBTRACT)

    # 草图50 → 切除-拉伸21 (cut, up to next)
    with BuildSketch(Plane.XY.offset(67), mode=Mode.PRIVATE) as cut_extrude_21_sk1:
        with Locations((0.25, -12.25)):
            Rectangle(SKETCH_50_W, SKETCH_50_H)
    cut_extrude_21_tool1 = extrude(cut_extrude_21_sk1.sketch, amount=-CUT_EXTRUDE_21_REACH, mode=Mode.PRIVATE) & part.part
    add(cut_extrude_21_tool1.solids().sort_by_distance((0.25, -12.25, 67))[0], mode=Mode.SUBTRACT)

    # 草图51 → 切除-拉伸22 (cut)
    with BuildSketch(Plane(origin=(0, 0, -28.85), x_dir=(-1, 0, 0), z_dir=(0, 0, -1))):
        Polygon((-4.225, -14), (-7, -14), (-7, -16), (-1.225, -16), (-1.225, -13), (-4.225, -13), align=None)
    extrude(amount=-CUT_EXTRUDE_22_DEPTH, mode=Mode.SUBTRACT)

    # 草图52 → 凸台-拉伸26 (add)
    with BuildSketch(Plane.XZ.offset(21)):
        with BuildLine():
            Line((1, 59.658312395), (1, 56.341687605))
            ThreePointArc((1, 56.341687605), (0.5, 58), (1, 59.658312395))
        make_face()
        with BuildLine():
            Line((1, 21.658312395), (1, 18.341687605))
            ThreePointArc((1, 18.341687605), (0.5, 20), (1, 21.658312395))
        make_face()
    extrude(amount=-EXTRUDE_26_DEPTH)

    # 草图53 → 凸台-拉伸27 (add)
    with BuildSketch(Plane.ZY.offset(-1)):
        Polygon((4, -21), (4, -19), (18.341687605, -19), (18.341687605, -6.5), (21.658312395, -6.5), (21.658312395, -19), (56.341687605, -19), (56.341687605, -6.5), (59.658312395, -6.5), (59.658312395, -19), (66, -19), (66, -6.5), (67, -6.5), (67, -19), (67, -21), align=None)
    extrude(amount=EXTRUDE_27_DEPTH)

    # 草图54 → 切除-拉伸23 (cut)
    with BuildSketch(Plane.ZY.offset(-1)):
        with Locations((39, -12.75)):
            Rectangle(SKETCH_54_W, SKETCH_54_H)
        with Locations((9.670843803, -12.75)):
            Rectangle(SKETCH_54_W_2, SKETCH_54_H)
    extrude(amount=-CUT_EXTRUDE_23_DEPTH, mode=Mode.SUBTRACT)

    # 草图55 → 凸台-拉伸28 (add, up to next)
    with BuildSketch(Plane.ZY.offset(-0.5), mode=Mode.PRIVATE) as extrude_28_sk1:
        Polygon((4, -18.336739034), (17.580705079, -6.5), (18.341687605, -6.5), (18.341687605, -7.163260966), (4.760982526, -19), (4, -19), align=None)
    extrude_28_tool1 = extrude(extrude_28_sk1.sketch, amount=-EXTRUDE_28_REACH, mode=Mode.PRIVATE) - part.part
    # 草图55 → 凸台-拉伸28 (add, up to next)
    with BuildSketch(Plane.ZY.offset(-0.5), mode=Mode.PRIVATE) as extrude_28_sk2:
        Polygon((23.132998269, -6.5), (39, -12.218518467), (54.867001731, -6.5), (56.341687605, -6.5), (56.341687605, -7.031481533), (40.474685873, -12.75), (56.341687605, -18.468518467), (56.341687605, -19), (54.867001731, -19), (39, -13.281481533), (23.132998269, -19), (21.658312395, -19), (21.658312395, -18.468518467), (37.525314127, -12.75), (21.658312395, -7.031481533), (21.658312395, -6.5), align=None)
    extrude_28_tool2 = extrude(extrude_28_sk2.sketch, amount=-EXTRUDE_28_REACH, mode=Mode.PRIVATE) - part.part
    # 草图55 → 凸台-拉伸28 (add, up to next)
    with BuildSketch(Plane.ZY.offset(-0.5), mode=Mode.PRIVATE) as extrude_28_sk3:
        Polygon((59.658312395, -7.605121348), (65.439333252, -19), (66, -19), (66, -17.894878652), (60.218979144, -6.5), (59.658312395, -6.5), align=None)
    extrude_28_tool3 = extrude(extrude_28_sk3.sketch, amount=-EXTRUDE_28_REACH, mode=Mode.PRIVATE) - part.part
    add(extrude_28_tool1.solids().sort_by_distance((0.5, -12.75, 11.170844))[0])
    add(extrude_28_tool2.solids().sort_by_distance((0.5, -12.75, 39))[0])
    add(extrude_28_tool3.solids().sort_by_distance((0.5, -12.75, 62.829156))[0])

    # 圆角2
    fillet_2_edges = [part.edges().sort_by_distance(p)[0] for p in [
        (2.25, -19, 4.760982526),
        (2.25, -18.336739034, 4),
        (2.5, -8.451494077, 15.341687605),
        (2.5, -9.77801601, 15.341687605),
        (0.75, -7.163260966, 18.341687605),
        (0.75, -6.5, 17.580705079),
        (0.75, -6.5, 54.867001731),
        (0.75, -6.5, 23.132998269),
        (2.25, -12.218518467, 39),
        (2.5, -8.112691184, 53.341687605),
        (0.75, -7.031481533, 56.341687605),
        (2.5, -17.387308816, 53.341687605),
        (2.25, -12.75, 40.474685873),
        (0.75, -19, 54.867001731),
        (2.25, -13.281481533, 39),
        (0.75, -18.468518467, 21.658312395),
        (2.25, -12.75, 37.525314127),
        (0.75, -7.031481533, 21.658312395),
        (0.75, -19, 23.132998269),
        (0.75, -18.468518467, 56.341687605),
        (0.75, -19, 65.439333252),
        (0.75, -6.5, 60.218979144),
        (0.75, -17.894878652, 66),
        (0.75, -7.605121348, 59.658312395),
        (2.25, -6.5, 4),
        (0.75, -19, 18.341687605),
        (0.75, -19, 59.658312395),
        (0.75, -6.5, 66),
        (2.5, -6.5, 15.341687605),
        (2.5, -19, 15.341687605),
    ]]
    fillet(fillet_2_edges, radius=FILLET_2_R)

    # 草图56 → 凸台-拉伸29 (add)
    with BuildSketch(Plane.ZY.offset(-0.5).offset(EXTRUDE_START)):
        with Locations((39, -12.75)):
            Circle(SKETCH_56_R)
        with Locations((39, -12.75)):
            Circle(SKETCH_56_R_2, mode=Mode.SUBTRACT)
    extrude(amount=EXTRUDE_29_DEPTH)

    # 圆角3
    fillet_3_edges = [part.edges().sort_by_distance(p)[0] for p in [
        (2.25, -14.565967072, 35.435976488),
        (2.25, -14.565967072, 42.564023512),
        (2.25, -10.934032928, 42.564023512),
        (2.25, -10.934032928, 35.435976488),
        (2.25, -11.874799388, 42.90307877),
        (2.25, -13.625200612, 42.90307877),
        (2.25, -13.625200612, 35.09692123),
        (2.25, -11.874799388, 35.09692123),
    ]]
    fillet(fillet_3_edges, radius=FILLET_3_R)

    # 草图57 → 切除-拉伸24 (cut, up to next)
    with BuildSketch(Plane.ZY.offset(-0.5), mode=Mode.PRIVATE) as cut_extrude_24_sk1:
        with Locations(Location((39, -12.75, 0), (0, 0, 270))):
            Circle(SKETCH_57_R)
    cut_extrude_24_tool1 = extrude(cut_extrude_24_sk1.sketch, amount=-CUT_EXTRUDE_24_REACH, mode=Mode.PRIVATE) & part.part
    # 草图57 → 切除-拉伸24 (cut, up to next)
    with BuildSketch(Plane.ZY.offset(-0.5), mode=Mode.PRIVATE) as cut_extrude_24_sk2:
        with Locations(Location((0, -12.75, 0), (0, 0, 270))):
            Circle(SKETCH_57_R)
    cut_extrude_24_tool2 = extrude(cut_extrude_24_sk2.sketch, amount=-CUT_EXTRUDE_24_REACH, mode=Mode.PRIVATE) & part.part
    add(cut_extrude_24_tool1.solids().sort_by_distance((0.5, -12.75, 39))[0], mode=Mode.SUBTRACT)
    add(cut_extrude_24_tool2.solids().sort_by_distance((0.5, -12.75, 0))[0], mode=Mode.SUBTRACT)

    # 草图58 → 切除-拉伸25 (cut)
    with SkipClean():  # the faces are left unmerged after this step: merging them gives an invalid solid
        with BuildSketch(Plane.ZY.offset(-0.5)):
            with Locations((-11.6, -8.75)):
                Rectangle(SKETCH_58_W, SKETCH_58_H)
        extrude(amount=-CUT_EXTRUDE_25_DEPTH, mode=Mode.SUBTRACT)

    # 圆角4
    fillet_4_edges = [part.edges().sort_by_distance(p)[0] for p in [
        (2.25, -13, -19.2),
        (2.25, -4.5, -19.2),
        (2.25, -4.5, -4),
        (2.25, -13, -4),
    ]]
    fillet(fillet_4_edges, radius=FILLET_4_R)

    # 草图31 → 凸台-拉伸30 (add)
    with SkipClean():  # the faces are left unmerged after this step: merging them gives an invalid solid
        with BuildSketch(Plane.ZY.offset(-5).offset(EXTRUDE_START_2)):
            with Locations((9.15, 11.75)):
                Rectangle(SKETCH_31_W, SKETCH_31_H)
            with BuildLine():
                Line((-14.2, 8), (17.8, 8))
                ThreePointArc((17.8, 8), (21.55, 11.75), (17.8, 15.5))
                Line((17.8, 15.5), (-14.2, 15.5))
                ThreePointArc((-14.2, 15.5), (-17.95, 11.75), (-14.2, 8))
            make_face(mode=Mode.SUBTRACT)
        extrude(amount=-EXTRUDE_30_DEPTH)

    # 草图59 → 切除-拉伸26 (cut, up to next)
    with BuildSketch(Plane.ZY.offset(-2.725), mode=Mode.PRIVATE) as cut_extrude_26_sk1:
        with Locations((-32.9, -16)):
            Rectangle(SKETCH_59_W, SKETCH_59_H)
    cut_extrude_26_tool1 = extrude(cut_extrude_26_sk1.sketch, amount=CUT_EXTRUDE_26_REACH, mode=Mode.PRIVATE) & part.part
    add(cut_extrude_26_tool1.solids().sort_by_distance((2.725, -16, -32.9))[0], mode=Mode.SUBTRACT)

    # 草图60 → 切除-拉伸27 (cut, up to next)
    with BuildSketch(Plane.ZY.offset(-2.725), mode=Mode.PRIVATE) as cut_extrude_27_sk1:
        Polygon((-37, -1), (-37, -7.828427125), (-38, -8.828427125), (-38, -21), (-40, -21), (-40, -8), (-39, -7), (-39, -1), align=None)
    cut_extrude_27_tool1 = extrude(cut_extrude_27_sk1.sketch, amount=-CUT_EXTRUDE_27_REACH, mode=Mode.PRIVATE) & part.part
    add(cut_extrude_27_tool1.solids().sort_by_distance((2.725, -10.937388, -38.651159))[0], mode=Mode.SUBTRACT)

    # 草图61 → 凸台-拉伸31 (add)
    with SkipClean():  # the faces are left unmerged after this step: merging them gives an invalid solid
        with BuildSketch(Plane(origin=(4.225, 0, 0), x_dir=(0, 0, -1), z_dir=(1, 0, 0))):
            Polygon((32.6, -16), (32.6, -14.5), (27.35, -14.5), (27.35, -16), (25.85, -16), (25.85, -13), (33.6, -13), (33.6, -16), align=None)
        extrude(amount=-EXTRUDE_31_DEPTH)

    # 草图62 → 凸台-拉伸32 (add)
    with SkipClean():  # the faces are left unmerged after this step: merging them gives an invalid solid
        with BuildSketch(Plane(origin=(0, 0, -25.85), x_dir=(-1, 0, 0), z_dir=(0, 0, -1))):
            with Locations((-5.6125, -15)):
                Rectangle(SKETCH_62_W, SKETCH_62_H)
        extrude(amount=EXTRUDE_32_DEPTH)

    # 草图63 → 凸台-拉伸33 (add)
    with SkipClean():  # the faces are left unmerged after this step: merging them gives an invalid solid
        with BuildSketch(Plane.ZY.offset(-2.725)):
            Polygon((-31.6, -13), (-31.6, -14.5), (-27.35, -14.5), (-27.35, -16), (-25.85, -16), (-25.85, -13), align=None)
        extrude(amount=EXTRUDE_33_DEPTH)

    # 草图64 → 凸台-拉伸34 (add)
    with SkipClean():  # the faces are left unmerged after this step: merging them gives an invalid solid
        with BuildSketch(Plane(origin=(0, 0, -38), x_dir=(-1, 0, 0), z_dir=(0, 0, -1))):
            with Locations((-4.8625, -18.5)):
                Rectangle(SKETCH_64_W, SKETCH_64_H)
        extrude(amount=EXTRUDE_34_DEPTH)

    # 倒角4
    chamfer_4_edges = [part.edges().sort_by_distance(p)[0] for p in [
        (4.8625, -21, -43),
    ]]
    chamfer(chamfer_4_edges, length=CHAMFER_4_SIZE)

    # 草图65 → 凸台-拉伸35 (add)
    with BuildSketch(Plane.XZ.offset(21).offset(EXTRUDE_START_3)):
        Polygon((2.725, -31.6), (2.725, -41), (7, -41), (7, 75), (3, 75), (3, 67), (0.5, 67), (0.5, -24.2), (1.225, -24.2), (1.225, -31.6), align=None)
        with Locations(Location((3.5, -18, 0), (0, 0, 270))):
            Circle(SKETCH_65_R, mode=Mode.SUBTRACT)
        with Locations(Location((3.5, 20, 0), (0, 0, 270))):
            Circle(SKETCH_65_R, mode=Mode.SUBTRACT)
        with Locations(Location((3.5, 58, 0), (0, 0, 270))):
            Circle(SKETCH_65_R, mode=Mode.SUBTRACT)
    extrude(amount=-EXTRUDE_35_DEPTH)

    # 草图66 → 切除-拉伸28 (cut)
    with BuildSketch(Plane(origin=(0, 0, -27.35), x_dir=(-1, 0, 0), z_dir=(0, 0, -1))):
        Polygon((-7, -16), (-1.225, -16), (-1.225, -14.5), (-4.225, -14.5), (-4.225, -14), (-7, -14), align=None)
    extrude(amount=-CUT_EXTRUDE_28_DEPTH, mode=Mode.SUBTRACT)

    # 草图67 → 凸台-拉伸36 (add)
    with BuildSketch(Plane.XY.offset(-32.6)):
        with Locations((3.475, -15.25)):
            Rectangle(SKETCH_67_W, SKETCH_67_H)
    extrude(amount=EXTRUDE_36_DEPTH)

    # 切除-拉伸29: up to this plane
    cut_extrude_29_end = Plane(origin=(-4.501, 24, 47.5), z_dir=(0, -0.7313537016191667, -0.6819983600625026))
    # 草图68 → 切除-拉伸29 (cut, up to the surface)
    with BuildSketch(Plane(origin=(0, 0, 7.8), x_dir=(-1, 0, 0), z_dir=(0, 0, -1)), mode=Mode.PRIVATE) as cut_extrude_29_sk1:
        Polygon((-1, 24), (-4, 21), (-1, 21), align=None)
    cut_extrude_29_tool1 = split(extrude(cut_extrude_29_sk1.sketch, amount=-CUT_EXTRUDE_29_REACH, mode=Mode.PRIVATE), bisect_by=cut_extrude_29_end, keep=Keep.BOTH, mode=Mode.PRIVATE)
    add(cut_extrude_29_tool1.solids().sort_by_distance((2, 22, 7.8))[0], mode=Mode.SUBTRACT)

    # 凸台-拉伸37: up to this plane
    extrude_37_end = Plane(origin=(-4.501, 24, 47.5), z_dir=(0, -0.7313537016191667, -0.6819983600625026))
    # 草图69 → 凸台-拉伸37 (add, up to the surface)
    with BuildSketch(Plane.XY.offset(10.8), mode=Mode.PRIVATE) as extrude_37_sk1:
        Polygon((-2, 22), (1, 19), (-2, 19), align=None)
    extrude_37_tool1 = split(extrude(extrude_37_sk1.sketch, amount=EXTRUDE_37_REACH, mode=Mode.PRIVATE), bisect_by=extrude_37_end, keep=Keep.BOTH, mode=Mode.PRIVATE)
    add(extrude_37_tool1.solids().sort_by_distance((-1, 20, 10.8))[0])

    # 草图70 → 切除-拉伸30 (cut, along a direction that is not the sketch's normal)
    with BuildSketch(Plane(origin=(0, 24, 0), x_dir=(1, 0, 0), z_dir=(0, 1, 0))):
        Polygon((-4.5, -42.36802285), (-4.5, -52.86184355), (-1, -52.86184355), (-1, -47.5), align=None)
    extrude(amount=-CUT_EXTRUDE_30_DEPTH, dir=(0, 0.6819983600625026, -0.7313537016191667), mode=Mode.SUBTRACT)

    # 草图71 → 凸台-拉伸38 (add)
    with BuildSketch(Plane.ZY.offset(4.5)):
        with BuildLine():
            Line((-11.2, 22), (44.51276027, 22))
            Line((44.51276027, 22), (42.36802285, 24))
            Line((42.36802285, 24), (-9.337, 24))
            ThreePointArc((-9.337, 24), (-10.465059109, 24.348490798), (-11.2, 25.272517354))
            Line((-11.2, 25.272517354), (-11.2, 22))
        make_face()
    extrude(amount=EXTRUDE_38_DEPTH)

    # 切除-拉伸31 outline → 切除-拉伸31 (cut)
    with BuildSketch(Plane(origin=(0, 0, 0), x_dir=(0.7071067811865441, 0.5171451618607982, 0.4822456651583028), z_dir=(0.707106781186551, -0.5171451618607931, -0.48224566515829803)).offset(CUT_EXTRUDE_START)):
        with Locations((29.5, 16)):
            Rectangle(CUT_EXTRUDE_31_OUTLINE_W, CUT_EXTRUDE_31_OUTLINE_H)
    extrude(amount=CUT_EXTRUDE_31_DEPTH, mode=Mode.SUBTRACT)

    # 圆角5
    fillet_5_edges = [part.edges().sort_by_distance(p)[0] for p in [
        (2.5, -17.387308816, 24.658312395),
        (2.5, -8.112691184, 24.658312395),
    ]]
    fillet(fillet_5_edges, radius=FILLET_5_R)

    # 草图73 → 切除-拉伸32 (cut)
    with BuildSketch(Plane(origin=(0, 0, -43), x_dir=(-1, 0, 0), z_dir=(0, 0, -1))):
        Polygon((-7, -3), (-6.225, -3), (-6.225, 4), (0, 4), (0, -22.5), (-7, -22.5), align=None)
    extrude(amount=-CUT_EXTRUDE_32_DEPTH, mode=Mode.SUBTRACT)

    # 草图75 → 切除-拉伸34 (cut, up to next)
    with BuildSketch(Plane.ZY.offset(-1), mode=Mode.PRIVATE) as cut_extrude_34_sk1:
        Polygon((75, -22.5), (75, -1.644164869), (70.390405376, 2.654351659), (58, -3), (58, -22.5), align=None)
    cut_extrude_34_tool1 = extrude(cut_extrude_34_sk1.sketch, amount=-CUT_EXTRUDE_34_REACH, mode=Mode.PRIVATE) & part.part
    add(cut_extrude_34_tool1.solids().sort_by_distance((1, -11.19008, 66.719728))[0], mode=Mode.SUBTRACT)

    # 草图75 → 切除-拉伸34 direction 2 (cut, up to next)
    with BuildSketch(Plane.ZY.offset(-1), mode=Mode.PRIVATE) as cut_extrude_34_direction_2_sk1:
        Polygon((75, -22.5), (75, -1.644164869), (70.390405376, 2.654351659), (58, -3), (58, -22.5), align=None)
    cut_extrude_34_direction_2_tool1 = extrude(cut_extrude_34_direction_2_sk1.sketch, amount=CUT_EXTRUDE_34_DIRECTION_2_REACH, mode=Mode.PRIVATE) & part.part
    add(cut_extrude_34_direction_2_tool1.solids().sort_by_distance((1, -11.19008, 66.719728))[0], mode=Mode.SUBTRACT)

    # 草图76 → 凸台-拉伸40 (add)
    with BuildSketch(Plane.ZY.offset(-6.225).offset(EXTRUDE_START_4)):
        with BuildLine():
            Line((-28.5, 3.1), (-28.5, -3))
            Line((-28.5, -3), (58, -3))
            Line((58, -3), (58, 4))
            Line((58, 4), (-28.574136013, 4))
            ThreePointArc((-28.574136013, 4), (-28.518565337, 3.551524127), (-28.5, 3.1))
        make_face()
        Circle(SKETCH_76_R, mode=Mode.SUBTRACT)
        with Locations((-20, 0)):
            Circle(SKETCH_76_R, mode=Mode.SUBTRACT)
    extrude(amount=-EXTRUDE_40_DEPTH)

    # 草图77 → 切除-拉伸35 (cut)
    with BuildSketch(Plane.ZY.offset(-1)):
        with BuildLine():
            Line((70.390405376, 2.654351659), (66.198595209, 6.563277878))
            ThreePointArc((66.198595209, 6.563277878), (61.157181777, 8.294978372), (58, 4))
            Line((58, 4), (58, -3))
            Line((58, -3), (70.390405376, 2.654351659))
        make_face()
    extrude(amount=-CUT_EXTRUDE_35_DEPTH, mode=Mode.SUBTRACT)

    # 草图79 → 切除-拉伸36 (cut, up to next)
    with BuildSketch(Plane.ZY.offset(-3), mode=Mode.PRIVATE) as cut_extrude_36_sk1:
        Polygon((14, 4.5), (14, 4), (58, 4), (58.027864045, 4.5), align=None)
    cut_extrude_36_tool1 = extrude(cut_extrude_36_sk1.sketch, amount=CUT_EXTRUDE_36_REACH, mode=Mode.PRIVATE) & part.part
    add(cut_extrude_36_tool1.solids().sort_by_distance((3, 4.250026, 36.006967))[0], mode=Mode.SUBTRACT)

    # 圆角7
    fillet_7_edges = [part.edges().sort_by_distance(p)[0] for p in [
        (6, -3, 58),
    ]]
    fillet(fillet_7_edges, radius=FILLET_7_R)

    # 圆角8
    fillet_8_edges = [part.edges().sort_by_distance(p)[0] for p in [
        (4, 4, 58),
    ]]
    fillet(fillet_8_edges, radius=FILLET_8_R)


solid = part.part
